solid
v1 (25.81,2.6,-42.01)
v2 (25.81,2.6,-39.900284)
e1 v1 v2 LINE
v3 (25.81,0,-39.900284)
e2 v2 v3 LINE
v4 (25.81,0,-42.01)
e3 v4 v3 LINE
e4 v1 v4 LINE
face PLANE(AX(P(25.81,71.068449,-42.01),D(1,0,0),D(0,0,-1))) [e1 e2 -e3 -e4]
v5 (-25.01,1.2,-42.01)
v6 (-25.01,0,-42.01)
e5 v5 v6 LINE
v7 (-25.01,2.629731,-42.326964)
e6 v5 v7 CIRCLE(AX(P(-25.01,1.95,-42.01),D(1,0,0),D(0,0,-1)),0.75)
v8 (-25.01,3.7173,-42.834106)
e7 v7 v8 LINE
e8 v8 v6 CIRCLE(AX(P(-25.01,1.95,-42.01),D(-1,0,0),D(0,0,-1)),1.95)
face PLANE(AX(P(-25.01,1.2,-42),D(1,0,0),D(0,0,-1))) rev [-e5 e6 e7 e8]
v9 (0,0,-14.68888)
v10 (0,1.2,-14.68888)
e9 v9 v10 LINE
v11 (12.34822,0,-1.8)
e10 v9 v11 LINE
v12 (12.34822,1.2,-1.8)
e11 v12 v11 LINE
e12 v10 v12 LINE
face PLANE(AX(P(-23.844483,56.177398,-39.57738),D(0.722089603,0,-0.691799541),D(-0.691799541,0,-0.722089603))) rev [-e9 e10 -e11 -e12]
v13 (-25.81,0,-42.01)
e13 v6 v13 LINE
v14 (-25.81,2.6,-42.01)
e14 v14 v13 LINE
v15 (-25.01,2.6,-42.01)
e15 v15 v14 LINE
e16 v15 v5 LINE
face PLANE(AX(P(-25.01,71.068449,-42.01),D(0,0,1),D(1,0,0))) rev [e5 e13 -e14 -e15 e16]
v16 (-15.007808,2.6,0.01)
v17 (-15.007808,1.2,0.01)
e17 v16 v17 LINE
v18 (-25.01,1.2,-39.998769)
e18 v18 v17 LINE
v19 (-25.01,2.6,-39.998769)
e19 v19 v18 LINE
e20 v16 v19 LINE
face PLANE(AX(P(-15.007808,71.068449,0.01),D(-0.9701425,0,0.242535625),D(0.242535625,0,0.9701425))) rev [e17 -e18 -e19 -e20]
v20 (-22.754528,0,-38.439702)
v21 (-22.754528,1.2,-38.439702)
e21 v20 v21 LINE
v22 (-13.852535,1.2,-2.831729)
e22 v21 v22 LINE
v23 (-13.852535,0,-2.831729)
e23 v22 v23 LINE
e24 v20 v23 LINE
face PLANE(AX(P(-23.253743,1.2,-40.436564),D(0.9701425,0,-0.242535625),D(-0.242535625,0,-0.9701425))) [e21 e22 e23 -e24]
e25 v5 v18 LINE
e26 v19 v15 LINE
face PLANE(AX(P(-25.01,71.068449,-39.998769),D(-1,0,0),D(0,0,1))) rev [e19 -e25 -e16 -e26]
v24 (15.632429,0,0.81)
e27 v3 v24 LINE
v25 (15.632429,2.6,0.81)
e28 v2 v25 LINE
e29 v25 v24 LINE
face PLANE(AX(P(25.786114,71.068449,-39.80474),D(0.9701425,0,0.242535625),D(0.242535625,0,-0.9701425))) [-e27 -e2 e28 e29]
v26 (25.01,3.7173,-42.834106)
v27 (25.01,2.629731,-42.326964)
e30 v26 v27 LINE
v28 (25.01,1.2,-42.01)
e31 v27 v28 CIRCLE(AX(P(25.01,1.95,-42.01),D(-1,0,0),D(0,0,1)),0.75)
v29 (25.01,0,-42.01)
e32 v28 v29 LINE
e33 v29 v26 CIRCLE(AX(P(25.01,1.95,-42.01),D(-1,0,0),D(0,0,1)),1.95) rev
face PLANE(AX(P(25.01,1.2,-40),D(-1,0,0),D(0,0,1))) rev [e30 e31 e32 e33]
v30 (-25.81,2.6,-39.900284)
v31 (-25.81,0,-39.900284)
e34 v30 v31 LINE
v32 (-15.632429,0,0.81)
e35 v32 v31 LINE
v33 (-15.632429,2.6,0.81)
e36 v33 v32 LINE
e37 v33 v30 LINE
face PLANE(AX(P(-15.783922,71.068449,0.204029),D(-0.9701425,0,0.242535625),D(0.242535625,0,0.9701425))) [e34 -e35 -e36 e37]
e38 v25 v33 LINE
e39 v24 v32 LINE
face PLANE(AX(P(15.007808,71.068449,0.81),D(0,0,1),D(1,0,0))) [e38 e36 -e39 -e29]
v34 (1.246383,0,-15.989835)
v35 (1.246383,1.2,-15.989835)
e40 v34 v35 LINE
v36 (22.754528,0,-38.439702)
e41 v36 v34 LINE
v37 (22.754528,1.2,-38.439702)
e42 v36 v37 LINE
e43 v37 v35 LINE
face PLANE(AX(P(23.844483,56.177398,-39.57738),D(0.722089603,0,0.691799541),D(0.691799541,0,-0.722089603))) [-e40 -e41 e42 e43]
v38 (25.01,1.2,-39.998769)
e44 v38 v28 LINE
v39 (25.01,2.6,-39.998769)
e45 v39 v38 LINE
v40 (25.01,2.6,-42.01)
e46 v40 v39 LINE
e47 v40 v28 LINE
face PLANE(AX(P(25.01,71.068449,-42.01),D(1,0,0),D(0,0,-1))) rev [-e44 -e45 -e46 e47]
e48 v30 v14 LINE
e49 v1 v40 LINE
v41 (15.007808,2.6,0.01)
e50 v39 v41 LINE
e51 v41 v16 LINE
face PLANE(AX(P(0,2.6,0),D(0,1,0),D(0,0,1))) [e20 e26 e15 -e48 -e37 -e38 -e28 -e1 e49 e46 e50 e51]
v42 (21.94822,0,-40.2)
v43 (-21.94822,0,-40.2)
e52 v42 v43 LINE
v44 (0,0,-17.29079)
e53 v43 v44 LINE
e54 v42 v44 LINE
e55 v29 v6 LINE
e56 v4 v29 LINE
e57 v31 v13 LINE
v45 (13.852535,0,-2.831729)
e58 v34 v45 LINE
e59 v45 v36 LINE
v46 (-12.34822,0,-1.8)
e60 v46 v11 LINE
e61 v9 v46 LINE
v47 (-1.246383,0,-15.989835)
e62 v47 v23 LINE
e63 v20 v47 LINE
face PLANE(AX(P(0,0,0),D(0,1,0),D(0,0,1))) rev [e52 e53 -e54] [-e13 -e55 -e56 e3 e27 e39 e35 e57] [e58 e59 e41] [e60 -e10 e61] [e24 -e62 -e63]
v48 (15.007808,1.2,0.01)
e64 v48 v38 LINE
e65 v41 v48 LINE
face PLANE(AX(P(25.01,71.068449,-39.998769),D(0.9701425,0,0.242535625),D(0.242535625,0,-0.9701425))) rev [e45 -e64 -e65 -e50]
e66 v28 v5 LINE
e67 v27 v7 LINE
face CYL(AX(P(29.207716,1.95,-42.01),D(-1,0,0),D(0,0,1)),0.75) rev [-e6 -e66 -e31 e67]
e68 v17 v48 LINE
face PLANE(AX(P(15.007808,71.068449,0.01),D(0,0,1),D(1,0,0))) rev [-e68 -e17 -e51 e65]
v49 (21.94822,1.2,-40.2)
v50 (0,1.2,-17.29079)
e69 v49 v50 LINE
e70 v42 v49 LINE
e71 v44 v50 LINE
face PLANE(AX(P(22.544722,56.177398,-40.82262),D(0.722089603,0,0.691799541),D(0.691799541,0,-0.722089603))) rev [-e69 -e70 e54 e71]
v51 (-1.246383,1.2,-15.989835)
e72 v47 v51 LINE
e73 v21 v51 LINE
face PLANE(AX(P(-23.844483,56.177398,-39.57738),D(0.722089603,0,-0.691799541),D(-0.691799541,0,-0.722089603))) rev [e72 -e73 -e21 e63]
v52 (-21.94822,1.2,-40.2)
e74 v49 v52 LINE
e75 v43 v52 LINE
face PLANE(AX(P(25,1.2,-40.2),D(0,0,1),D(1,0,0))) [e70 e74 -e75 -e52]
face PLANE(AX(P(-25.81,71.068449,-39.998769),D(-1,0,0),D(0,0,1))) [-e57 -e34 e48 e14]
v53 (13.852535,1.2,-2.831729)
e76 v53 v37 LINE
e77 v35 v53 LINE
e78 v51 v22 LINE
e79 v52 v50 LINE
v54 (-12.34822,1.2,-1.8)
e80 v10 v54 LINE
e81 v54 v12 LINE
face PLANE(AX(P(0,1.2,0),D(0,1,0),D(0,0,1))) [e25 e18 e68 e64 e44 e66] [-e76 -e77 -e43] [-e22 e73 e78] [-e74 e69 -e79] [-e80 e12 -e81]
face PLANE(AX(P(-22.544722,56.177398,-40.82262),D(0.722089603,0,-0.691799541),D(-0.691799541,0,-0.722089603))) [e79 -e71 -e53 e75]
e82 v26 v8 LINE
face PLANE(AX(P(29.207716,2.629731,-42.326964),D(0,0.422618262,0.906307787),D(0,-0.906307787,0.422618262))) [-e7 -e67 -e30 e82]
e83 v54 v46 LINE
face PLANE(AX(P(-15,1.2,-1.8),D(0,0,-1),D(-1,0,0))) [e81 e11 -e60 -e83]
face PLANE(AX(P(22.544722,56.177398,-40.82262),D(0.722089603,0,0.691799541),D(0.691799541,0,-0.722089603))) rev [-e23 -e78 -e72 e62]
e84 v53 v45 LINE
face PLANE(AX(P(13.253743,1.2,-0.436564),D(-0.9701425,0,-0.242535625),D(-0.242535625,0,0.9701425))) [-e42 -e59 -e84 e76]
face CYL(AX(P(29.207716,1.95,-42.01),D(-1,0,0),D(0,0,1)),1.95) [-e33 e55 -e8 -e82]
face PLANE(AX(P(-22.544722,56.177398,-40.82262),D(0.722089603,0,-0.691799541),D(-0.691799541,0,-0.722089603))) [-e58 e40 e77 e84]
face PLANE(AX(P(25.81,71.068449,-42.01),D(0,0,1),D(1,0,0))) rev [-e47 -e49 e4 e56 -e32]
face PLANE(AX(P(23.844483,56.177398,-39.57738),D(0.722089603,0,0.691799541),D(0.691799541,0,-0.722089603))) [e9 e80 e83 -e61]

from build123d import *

# Parameters (mm, degrees)
EXTRUDE_THIN1_DEPTH = 1.2
EXTRUDE_THIN2_DEPTH = 1.2
BOSS_EXTRUDE1_DEPTH = 50.02
EXTRUDE_THIN5_START = -2.6
EXTRUDE_THIN5_DEPTH = 2.6


# Read off the part's stored shape, not the designer's step: Extrude-Thin1
with BuildPart() as part:
    # Extrude-Thin1 outline → Extrude-Thin1 (new body)
    with BuildSketch(Plane(origin=(0, 0, 0), x_dir=(1, 0, 0), z_dir=(0, 1, 0))):
        Polygon((-25.01, 39.998768944), (-15.007807764, -0.01), (15.007807764, -0.01), (25.01, 39.998768944), (25.01, 42.01), (-25.01, 42.01), align=None)
        Polygon((13.594602468, 1.8), (-13.594602468, 1.8), (-23.194602468, 40.2), (23.194602468, 40.2), align=None, mode=Mode.SUBTRACT)
    extrude(amount=EXTRUDE_THIN1_DEPTH)

    # Sketch3 → Extrude-Thin2 (add)
    with BuildSketch(Plane.XZ):
        Polygon((23.844483111, -39.577380413), (-12.944721826, -1.177380413), (-14.244483111, -2.422619587), (22.544721826, -40.822619587), align=None)
        Polygon((-22.544721826, -40.822619587), (14.244483111, -2.422619587), (12.944721826, -1.177380413), (-23.844483111, -39.577380413), align=None)
    extrude(amount=-EXTRUDE_THIN2_DEPTH)

    # Sketch4 → Boss-Extrude1 (add)
    with BuildSketch(Plane.ZY.offset(25.01)):
        with BuildLine():
            Line((-42.326963696, 2.62973084), (-42.83410561, 3.717300185))
            ThreePointArc((-42.83410561, 3.717300185), (-43.913777214, 1.527942753), (-42.01, 0))
            Line((-42.01, 0), (-42.01, 1.2))
            ThreePointArc((-42.01, 1.2), (-42.742222005, 1.78767029), (-42.326963696, 2.62973084))
        make_face()
    extrude(amount=-BOSS_EXTRUDE1_DEPTH)

    # Sketch5 → Extrude-Thin5 (add)
    with BuildSketch(Plane.XZ.offset(EXTRUDE_THIN5_START)):
        Polygon((25.01, -42.01), (25.01, -39.998768944), (15.007807764, 0.01), (-15.007807764, 0.01), (-25.01, -39.998768944), (-25.01, -42.01), (-25.81, -42.01), (-25.81, -39.900284443), (-15.632428889, 0.81), (15.632428889, 0.81), (25.81, -39.900284443), (25.81, -42.01), align=None)
    extrude(amount=EXTRUDE_THIN5_DEPTH)


solid = part.part
